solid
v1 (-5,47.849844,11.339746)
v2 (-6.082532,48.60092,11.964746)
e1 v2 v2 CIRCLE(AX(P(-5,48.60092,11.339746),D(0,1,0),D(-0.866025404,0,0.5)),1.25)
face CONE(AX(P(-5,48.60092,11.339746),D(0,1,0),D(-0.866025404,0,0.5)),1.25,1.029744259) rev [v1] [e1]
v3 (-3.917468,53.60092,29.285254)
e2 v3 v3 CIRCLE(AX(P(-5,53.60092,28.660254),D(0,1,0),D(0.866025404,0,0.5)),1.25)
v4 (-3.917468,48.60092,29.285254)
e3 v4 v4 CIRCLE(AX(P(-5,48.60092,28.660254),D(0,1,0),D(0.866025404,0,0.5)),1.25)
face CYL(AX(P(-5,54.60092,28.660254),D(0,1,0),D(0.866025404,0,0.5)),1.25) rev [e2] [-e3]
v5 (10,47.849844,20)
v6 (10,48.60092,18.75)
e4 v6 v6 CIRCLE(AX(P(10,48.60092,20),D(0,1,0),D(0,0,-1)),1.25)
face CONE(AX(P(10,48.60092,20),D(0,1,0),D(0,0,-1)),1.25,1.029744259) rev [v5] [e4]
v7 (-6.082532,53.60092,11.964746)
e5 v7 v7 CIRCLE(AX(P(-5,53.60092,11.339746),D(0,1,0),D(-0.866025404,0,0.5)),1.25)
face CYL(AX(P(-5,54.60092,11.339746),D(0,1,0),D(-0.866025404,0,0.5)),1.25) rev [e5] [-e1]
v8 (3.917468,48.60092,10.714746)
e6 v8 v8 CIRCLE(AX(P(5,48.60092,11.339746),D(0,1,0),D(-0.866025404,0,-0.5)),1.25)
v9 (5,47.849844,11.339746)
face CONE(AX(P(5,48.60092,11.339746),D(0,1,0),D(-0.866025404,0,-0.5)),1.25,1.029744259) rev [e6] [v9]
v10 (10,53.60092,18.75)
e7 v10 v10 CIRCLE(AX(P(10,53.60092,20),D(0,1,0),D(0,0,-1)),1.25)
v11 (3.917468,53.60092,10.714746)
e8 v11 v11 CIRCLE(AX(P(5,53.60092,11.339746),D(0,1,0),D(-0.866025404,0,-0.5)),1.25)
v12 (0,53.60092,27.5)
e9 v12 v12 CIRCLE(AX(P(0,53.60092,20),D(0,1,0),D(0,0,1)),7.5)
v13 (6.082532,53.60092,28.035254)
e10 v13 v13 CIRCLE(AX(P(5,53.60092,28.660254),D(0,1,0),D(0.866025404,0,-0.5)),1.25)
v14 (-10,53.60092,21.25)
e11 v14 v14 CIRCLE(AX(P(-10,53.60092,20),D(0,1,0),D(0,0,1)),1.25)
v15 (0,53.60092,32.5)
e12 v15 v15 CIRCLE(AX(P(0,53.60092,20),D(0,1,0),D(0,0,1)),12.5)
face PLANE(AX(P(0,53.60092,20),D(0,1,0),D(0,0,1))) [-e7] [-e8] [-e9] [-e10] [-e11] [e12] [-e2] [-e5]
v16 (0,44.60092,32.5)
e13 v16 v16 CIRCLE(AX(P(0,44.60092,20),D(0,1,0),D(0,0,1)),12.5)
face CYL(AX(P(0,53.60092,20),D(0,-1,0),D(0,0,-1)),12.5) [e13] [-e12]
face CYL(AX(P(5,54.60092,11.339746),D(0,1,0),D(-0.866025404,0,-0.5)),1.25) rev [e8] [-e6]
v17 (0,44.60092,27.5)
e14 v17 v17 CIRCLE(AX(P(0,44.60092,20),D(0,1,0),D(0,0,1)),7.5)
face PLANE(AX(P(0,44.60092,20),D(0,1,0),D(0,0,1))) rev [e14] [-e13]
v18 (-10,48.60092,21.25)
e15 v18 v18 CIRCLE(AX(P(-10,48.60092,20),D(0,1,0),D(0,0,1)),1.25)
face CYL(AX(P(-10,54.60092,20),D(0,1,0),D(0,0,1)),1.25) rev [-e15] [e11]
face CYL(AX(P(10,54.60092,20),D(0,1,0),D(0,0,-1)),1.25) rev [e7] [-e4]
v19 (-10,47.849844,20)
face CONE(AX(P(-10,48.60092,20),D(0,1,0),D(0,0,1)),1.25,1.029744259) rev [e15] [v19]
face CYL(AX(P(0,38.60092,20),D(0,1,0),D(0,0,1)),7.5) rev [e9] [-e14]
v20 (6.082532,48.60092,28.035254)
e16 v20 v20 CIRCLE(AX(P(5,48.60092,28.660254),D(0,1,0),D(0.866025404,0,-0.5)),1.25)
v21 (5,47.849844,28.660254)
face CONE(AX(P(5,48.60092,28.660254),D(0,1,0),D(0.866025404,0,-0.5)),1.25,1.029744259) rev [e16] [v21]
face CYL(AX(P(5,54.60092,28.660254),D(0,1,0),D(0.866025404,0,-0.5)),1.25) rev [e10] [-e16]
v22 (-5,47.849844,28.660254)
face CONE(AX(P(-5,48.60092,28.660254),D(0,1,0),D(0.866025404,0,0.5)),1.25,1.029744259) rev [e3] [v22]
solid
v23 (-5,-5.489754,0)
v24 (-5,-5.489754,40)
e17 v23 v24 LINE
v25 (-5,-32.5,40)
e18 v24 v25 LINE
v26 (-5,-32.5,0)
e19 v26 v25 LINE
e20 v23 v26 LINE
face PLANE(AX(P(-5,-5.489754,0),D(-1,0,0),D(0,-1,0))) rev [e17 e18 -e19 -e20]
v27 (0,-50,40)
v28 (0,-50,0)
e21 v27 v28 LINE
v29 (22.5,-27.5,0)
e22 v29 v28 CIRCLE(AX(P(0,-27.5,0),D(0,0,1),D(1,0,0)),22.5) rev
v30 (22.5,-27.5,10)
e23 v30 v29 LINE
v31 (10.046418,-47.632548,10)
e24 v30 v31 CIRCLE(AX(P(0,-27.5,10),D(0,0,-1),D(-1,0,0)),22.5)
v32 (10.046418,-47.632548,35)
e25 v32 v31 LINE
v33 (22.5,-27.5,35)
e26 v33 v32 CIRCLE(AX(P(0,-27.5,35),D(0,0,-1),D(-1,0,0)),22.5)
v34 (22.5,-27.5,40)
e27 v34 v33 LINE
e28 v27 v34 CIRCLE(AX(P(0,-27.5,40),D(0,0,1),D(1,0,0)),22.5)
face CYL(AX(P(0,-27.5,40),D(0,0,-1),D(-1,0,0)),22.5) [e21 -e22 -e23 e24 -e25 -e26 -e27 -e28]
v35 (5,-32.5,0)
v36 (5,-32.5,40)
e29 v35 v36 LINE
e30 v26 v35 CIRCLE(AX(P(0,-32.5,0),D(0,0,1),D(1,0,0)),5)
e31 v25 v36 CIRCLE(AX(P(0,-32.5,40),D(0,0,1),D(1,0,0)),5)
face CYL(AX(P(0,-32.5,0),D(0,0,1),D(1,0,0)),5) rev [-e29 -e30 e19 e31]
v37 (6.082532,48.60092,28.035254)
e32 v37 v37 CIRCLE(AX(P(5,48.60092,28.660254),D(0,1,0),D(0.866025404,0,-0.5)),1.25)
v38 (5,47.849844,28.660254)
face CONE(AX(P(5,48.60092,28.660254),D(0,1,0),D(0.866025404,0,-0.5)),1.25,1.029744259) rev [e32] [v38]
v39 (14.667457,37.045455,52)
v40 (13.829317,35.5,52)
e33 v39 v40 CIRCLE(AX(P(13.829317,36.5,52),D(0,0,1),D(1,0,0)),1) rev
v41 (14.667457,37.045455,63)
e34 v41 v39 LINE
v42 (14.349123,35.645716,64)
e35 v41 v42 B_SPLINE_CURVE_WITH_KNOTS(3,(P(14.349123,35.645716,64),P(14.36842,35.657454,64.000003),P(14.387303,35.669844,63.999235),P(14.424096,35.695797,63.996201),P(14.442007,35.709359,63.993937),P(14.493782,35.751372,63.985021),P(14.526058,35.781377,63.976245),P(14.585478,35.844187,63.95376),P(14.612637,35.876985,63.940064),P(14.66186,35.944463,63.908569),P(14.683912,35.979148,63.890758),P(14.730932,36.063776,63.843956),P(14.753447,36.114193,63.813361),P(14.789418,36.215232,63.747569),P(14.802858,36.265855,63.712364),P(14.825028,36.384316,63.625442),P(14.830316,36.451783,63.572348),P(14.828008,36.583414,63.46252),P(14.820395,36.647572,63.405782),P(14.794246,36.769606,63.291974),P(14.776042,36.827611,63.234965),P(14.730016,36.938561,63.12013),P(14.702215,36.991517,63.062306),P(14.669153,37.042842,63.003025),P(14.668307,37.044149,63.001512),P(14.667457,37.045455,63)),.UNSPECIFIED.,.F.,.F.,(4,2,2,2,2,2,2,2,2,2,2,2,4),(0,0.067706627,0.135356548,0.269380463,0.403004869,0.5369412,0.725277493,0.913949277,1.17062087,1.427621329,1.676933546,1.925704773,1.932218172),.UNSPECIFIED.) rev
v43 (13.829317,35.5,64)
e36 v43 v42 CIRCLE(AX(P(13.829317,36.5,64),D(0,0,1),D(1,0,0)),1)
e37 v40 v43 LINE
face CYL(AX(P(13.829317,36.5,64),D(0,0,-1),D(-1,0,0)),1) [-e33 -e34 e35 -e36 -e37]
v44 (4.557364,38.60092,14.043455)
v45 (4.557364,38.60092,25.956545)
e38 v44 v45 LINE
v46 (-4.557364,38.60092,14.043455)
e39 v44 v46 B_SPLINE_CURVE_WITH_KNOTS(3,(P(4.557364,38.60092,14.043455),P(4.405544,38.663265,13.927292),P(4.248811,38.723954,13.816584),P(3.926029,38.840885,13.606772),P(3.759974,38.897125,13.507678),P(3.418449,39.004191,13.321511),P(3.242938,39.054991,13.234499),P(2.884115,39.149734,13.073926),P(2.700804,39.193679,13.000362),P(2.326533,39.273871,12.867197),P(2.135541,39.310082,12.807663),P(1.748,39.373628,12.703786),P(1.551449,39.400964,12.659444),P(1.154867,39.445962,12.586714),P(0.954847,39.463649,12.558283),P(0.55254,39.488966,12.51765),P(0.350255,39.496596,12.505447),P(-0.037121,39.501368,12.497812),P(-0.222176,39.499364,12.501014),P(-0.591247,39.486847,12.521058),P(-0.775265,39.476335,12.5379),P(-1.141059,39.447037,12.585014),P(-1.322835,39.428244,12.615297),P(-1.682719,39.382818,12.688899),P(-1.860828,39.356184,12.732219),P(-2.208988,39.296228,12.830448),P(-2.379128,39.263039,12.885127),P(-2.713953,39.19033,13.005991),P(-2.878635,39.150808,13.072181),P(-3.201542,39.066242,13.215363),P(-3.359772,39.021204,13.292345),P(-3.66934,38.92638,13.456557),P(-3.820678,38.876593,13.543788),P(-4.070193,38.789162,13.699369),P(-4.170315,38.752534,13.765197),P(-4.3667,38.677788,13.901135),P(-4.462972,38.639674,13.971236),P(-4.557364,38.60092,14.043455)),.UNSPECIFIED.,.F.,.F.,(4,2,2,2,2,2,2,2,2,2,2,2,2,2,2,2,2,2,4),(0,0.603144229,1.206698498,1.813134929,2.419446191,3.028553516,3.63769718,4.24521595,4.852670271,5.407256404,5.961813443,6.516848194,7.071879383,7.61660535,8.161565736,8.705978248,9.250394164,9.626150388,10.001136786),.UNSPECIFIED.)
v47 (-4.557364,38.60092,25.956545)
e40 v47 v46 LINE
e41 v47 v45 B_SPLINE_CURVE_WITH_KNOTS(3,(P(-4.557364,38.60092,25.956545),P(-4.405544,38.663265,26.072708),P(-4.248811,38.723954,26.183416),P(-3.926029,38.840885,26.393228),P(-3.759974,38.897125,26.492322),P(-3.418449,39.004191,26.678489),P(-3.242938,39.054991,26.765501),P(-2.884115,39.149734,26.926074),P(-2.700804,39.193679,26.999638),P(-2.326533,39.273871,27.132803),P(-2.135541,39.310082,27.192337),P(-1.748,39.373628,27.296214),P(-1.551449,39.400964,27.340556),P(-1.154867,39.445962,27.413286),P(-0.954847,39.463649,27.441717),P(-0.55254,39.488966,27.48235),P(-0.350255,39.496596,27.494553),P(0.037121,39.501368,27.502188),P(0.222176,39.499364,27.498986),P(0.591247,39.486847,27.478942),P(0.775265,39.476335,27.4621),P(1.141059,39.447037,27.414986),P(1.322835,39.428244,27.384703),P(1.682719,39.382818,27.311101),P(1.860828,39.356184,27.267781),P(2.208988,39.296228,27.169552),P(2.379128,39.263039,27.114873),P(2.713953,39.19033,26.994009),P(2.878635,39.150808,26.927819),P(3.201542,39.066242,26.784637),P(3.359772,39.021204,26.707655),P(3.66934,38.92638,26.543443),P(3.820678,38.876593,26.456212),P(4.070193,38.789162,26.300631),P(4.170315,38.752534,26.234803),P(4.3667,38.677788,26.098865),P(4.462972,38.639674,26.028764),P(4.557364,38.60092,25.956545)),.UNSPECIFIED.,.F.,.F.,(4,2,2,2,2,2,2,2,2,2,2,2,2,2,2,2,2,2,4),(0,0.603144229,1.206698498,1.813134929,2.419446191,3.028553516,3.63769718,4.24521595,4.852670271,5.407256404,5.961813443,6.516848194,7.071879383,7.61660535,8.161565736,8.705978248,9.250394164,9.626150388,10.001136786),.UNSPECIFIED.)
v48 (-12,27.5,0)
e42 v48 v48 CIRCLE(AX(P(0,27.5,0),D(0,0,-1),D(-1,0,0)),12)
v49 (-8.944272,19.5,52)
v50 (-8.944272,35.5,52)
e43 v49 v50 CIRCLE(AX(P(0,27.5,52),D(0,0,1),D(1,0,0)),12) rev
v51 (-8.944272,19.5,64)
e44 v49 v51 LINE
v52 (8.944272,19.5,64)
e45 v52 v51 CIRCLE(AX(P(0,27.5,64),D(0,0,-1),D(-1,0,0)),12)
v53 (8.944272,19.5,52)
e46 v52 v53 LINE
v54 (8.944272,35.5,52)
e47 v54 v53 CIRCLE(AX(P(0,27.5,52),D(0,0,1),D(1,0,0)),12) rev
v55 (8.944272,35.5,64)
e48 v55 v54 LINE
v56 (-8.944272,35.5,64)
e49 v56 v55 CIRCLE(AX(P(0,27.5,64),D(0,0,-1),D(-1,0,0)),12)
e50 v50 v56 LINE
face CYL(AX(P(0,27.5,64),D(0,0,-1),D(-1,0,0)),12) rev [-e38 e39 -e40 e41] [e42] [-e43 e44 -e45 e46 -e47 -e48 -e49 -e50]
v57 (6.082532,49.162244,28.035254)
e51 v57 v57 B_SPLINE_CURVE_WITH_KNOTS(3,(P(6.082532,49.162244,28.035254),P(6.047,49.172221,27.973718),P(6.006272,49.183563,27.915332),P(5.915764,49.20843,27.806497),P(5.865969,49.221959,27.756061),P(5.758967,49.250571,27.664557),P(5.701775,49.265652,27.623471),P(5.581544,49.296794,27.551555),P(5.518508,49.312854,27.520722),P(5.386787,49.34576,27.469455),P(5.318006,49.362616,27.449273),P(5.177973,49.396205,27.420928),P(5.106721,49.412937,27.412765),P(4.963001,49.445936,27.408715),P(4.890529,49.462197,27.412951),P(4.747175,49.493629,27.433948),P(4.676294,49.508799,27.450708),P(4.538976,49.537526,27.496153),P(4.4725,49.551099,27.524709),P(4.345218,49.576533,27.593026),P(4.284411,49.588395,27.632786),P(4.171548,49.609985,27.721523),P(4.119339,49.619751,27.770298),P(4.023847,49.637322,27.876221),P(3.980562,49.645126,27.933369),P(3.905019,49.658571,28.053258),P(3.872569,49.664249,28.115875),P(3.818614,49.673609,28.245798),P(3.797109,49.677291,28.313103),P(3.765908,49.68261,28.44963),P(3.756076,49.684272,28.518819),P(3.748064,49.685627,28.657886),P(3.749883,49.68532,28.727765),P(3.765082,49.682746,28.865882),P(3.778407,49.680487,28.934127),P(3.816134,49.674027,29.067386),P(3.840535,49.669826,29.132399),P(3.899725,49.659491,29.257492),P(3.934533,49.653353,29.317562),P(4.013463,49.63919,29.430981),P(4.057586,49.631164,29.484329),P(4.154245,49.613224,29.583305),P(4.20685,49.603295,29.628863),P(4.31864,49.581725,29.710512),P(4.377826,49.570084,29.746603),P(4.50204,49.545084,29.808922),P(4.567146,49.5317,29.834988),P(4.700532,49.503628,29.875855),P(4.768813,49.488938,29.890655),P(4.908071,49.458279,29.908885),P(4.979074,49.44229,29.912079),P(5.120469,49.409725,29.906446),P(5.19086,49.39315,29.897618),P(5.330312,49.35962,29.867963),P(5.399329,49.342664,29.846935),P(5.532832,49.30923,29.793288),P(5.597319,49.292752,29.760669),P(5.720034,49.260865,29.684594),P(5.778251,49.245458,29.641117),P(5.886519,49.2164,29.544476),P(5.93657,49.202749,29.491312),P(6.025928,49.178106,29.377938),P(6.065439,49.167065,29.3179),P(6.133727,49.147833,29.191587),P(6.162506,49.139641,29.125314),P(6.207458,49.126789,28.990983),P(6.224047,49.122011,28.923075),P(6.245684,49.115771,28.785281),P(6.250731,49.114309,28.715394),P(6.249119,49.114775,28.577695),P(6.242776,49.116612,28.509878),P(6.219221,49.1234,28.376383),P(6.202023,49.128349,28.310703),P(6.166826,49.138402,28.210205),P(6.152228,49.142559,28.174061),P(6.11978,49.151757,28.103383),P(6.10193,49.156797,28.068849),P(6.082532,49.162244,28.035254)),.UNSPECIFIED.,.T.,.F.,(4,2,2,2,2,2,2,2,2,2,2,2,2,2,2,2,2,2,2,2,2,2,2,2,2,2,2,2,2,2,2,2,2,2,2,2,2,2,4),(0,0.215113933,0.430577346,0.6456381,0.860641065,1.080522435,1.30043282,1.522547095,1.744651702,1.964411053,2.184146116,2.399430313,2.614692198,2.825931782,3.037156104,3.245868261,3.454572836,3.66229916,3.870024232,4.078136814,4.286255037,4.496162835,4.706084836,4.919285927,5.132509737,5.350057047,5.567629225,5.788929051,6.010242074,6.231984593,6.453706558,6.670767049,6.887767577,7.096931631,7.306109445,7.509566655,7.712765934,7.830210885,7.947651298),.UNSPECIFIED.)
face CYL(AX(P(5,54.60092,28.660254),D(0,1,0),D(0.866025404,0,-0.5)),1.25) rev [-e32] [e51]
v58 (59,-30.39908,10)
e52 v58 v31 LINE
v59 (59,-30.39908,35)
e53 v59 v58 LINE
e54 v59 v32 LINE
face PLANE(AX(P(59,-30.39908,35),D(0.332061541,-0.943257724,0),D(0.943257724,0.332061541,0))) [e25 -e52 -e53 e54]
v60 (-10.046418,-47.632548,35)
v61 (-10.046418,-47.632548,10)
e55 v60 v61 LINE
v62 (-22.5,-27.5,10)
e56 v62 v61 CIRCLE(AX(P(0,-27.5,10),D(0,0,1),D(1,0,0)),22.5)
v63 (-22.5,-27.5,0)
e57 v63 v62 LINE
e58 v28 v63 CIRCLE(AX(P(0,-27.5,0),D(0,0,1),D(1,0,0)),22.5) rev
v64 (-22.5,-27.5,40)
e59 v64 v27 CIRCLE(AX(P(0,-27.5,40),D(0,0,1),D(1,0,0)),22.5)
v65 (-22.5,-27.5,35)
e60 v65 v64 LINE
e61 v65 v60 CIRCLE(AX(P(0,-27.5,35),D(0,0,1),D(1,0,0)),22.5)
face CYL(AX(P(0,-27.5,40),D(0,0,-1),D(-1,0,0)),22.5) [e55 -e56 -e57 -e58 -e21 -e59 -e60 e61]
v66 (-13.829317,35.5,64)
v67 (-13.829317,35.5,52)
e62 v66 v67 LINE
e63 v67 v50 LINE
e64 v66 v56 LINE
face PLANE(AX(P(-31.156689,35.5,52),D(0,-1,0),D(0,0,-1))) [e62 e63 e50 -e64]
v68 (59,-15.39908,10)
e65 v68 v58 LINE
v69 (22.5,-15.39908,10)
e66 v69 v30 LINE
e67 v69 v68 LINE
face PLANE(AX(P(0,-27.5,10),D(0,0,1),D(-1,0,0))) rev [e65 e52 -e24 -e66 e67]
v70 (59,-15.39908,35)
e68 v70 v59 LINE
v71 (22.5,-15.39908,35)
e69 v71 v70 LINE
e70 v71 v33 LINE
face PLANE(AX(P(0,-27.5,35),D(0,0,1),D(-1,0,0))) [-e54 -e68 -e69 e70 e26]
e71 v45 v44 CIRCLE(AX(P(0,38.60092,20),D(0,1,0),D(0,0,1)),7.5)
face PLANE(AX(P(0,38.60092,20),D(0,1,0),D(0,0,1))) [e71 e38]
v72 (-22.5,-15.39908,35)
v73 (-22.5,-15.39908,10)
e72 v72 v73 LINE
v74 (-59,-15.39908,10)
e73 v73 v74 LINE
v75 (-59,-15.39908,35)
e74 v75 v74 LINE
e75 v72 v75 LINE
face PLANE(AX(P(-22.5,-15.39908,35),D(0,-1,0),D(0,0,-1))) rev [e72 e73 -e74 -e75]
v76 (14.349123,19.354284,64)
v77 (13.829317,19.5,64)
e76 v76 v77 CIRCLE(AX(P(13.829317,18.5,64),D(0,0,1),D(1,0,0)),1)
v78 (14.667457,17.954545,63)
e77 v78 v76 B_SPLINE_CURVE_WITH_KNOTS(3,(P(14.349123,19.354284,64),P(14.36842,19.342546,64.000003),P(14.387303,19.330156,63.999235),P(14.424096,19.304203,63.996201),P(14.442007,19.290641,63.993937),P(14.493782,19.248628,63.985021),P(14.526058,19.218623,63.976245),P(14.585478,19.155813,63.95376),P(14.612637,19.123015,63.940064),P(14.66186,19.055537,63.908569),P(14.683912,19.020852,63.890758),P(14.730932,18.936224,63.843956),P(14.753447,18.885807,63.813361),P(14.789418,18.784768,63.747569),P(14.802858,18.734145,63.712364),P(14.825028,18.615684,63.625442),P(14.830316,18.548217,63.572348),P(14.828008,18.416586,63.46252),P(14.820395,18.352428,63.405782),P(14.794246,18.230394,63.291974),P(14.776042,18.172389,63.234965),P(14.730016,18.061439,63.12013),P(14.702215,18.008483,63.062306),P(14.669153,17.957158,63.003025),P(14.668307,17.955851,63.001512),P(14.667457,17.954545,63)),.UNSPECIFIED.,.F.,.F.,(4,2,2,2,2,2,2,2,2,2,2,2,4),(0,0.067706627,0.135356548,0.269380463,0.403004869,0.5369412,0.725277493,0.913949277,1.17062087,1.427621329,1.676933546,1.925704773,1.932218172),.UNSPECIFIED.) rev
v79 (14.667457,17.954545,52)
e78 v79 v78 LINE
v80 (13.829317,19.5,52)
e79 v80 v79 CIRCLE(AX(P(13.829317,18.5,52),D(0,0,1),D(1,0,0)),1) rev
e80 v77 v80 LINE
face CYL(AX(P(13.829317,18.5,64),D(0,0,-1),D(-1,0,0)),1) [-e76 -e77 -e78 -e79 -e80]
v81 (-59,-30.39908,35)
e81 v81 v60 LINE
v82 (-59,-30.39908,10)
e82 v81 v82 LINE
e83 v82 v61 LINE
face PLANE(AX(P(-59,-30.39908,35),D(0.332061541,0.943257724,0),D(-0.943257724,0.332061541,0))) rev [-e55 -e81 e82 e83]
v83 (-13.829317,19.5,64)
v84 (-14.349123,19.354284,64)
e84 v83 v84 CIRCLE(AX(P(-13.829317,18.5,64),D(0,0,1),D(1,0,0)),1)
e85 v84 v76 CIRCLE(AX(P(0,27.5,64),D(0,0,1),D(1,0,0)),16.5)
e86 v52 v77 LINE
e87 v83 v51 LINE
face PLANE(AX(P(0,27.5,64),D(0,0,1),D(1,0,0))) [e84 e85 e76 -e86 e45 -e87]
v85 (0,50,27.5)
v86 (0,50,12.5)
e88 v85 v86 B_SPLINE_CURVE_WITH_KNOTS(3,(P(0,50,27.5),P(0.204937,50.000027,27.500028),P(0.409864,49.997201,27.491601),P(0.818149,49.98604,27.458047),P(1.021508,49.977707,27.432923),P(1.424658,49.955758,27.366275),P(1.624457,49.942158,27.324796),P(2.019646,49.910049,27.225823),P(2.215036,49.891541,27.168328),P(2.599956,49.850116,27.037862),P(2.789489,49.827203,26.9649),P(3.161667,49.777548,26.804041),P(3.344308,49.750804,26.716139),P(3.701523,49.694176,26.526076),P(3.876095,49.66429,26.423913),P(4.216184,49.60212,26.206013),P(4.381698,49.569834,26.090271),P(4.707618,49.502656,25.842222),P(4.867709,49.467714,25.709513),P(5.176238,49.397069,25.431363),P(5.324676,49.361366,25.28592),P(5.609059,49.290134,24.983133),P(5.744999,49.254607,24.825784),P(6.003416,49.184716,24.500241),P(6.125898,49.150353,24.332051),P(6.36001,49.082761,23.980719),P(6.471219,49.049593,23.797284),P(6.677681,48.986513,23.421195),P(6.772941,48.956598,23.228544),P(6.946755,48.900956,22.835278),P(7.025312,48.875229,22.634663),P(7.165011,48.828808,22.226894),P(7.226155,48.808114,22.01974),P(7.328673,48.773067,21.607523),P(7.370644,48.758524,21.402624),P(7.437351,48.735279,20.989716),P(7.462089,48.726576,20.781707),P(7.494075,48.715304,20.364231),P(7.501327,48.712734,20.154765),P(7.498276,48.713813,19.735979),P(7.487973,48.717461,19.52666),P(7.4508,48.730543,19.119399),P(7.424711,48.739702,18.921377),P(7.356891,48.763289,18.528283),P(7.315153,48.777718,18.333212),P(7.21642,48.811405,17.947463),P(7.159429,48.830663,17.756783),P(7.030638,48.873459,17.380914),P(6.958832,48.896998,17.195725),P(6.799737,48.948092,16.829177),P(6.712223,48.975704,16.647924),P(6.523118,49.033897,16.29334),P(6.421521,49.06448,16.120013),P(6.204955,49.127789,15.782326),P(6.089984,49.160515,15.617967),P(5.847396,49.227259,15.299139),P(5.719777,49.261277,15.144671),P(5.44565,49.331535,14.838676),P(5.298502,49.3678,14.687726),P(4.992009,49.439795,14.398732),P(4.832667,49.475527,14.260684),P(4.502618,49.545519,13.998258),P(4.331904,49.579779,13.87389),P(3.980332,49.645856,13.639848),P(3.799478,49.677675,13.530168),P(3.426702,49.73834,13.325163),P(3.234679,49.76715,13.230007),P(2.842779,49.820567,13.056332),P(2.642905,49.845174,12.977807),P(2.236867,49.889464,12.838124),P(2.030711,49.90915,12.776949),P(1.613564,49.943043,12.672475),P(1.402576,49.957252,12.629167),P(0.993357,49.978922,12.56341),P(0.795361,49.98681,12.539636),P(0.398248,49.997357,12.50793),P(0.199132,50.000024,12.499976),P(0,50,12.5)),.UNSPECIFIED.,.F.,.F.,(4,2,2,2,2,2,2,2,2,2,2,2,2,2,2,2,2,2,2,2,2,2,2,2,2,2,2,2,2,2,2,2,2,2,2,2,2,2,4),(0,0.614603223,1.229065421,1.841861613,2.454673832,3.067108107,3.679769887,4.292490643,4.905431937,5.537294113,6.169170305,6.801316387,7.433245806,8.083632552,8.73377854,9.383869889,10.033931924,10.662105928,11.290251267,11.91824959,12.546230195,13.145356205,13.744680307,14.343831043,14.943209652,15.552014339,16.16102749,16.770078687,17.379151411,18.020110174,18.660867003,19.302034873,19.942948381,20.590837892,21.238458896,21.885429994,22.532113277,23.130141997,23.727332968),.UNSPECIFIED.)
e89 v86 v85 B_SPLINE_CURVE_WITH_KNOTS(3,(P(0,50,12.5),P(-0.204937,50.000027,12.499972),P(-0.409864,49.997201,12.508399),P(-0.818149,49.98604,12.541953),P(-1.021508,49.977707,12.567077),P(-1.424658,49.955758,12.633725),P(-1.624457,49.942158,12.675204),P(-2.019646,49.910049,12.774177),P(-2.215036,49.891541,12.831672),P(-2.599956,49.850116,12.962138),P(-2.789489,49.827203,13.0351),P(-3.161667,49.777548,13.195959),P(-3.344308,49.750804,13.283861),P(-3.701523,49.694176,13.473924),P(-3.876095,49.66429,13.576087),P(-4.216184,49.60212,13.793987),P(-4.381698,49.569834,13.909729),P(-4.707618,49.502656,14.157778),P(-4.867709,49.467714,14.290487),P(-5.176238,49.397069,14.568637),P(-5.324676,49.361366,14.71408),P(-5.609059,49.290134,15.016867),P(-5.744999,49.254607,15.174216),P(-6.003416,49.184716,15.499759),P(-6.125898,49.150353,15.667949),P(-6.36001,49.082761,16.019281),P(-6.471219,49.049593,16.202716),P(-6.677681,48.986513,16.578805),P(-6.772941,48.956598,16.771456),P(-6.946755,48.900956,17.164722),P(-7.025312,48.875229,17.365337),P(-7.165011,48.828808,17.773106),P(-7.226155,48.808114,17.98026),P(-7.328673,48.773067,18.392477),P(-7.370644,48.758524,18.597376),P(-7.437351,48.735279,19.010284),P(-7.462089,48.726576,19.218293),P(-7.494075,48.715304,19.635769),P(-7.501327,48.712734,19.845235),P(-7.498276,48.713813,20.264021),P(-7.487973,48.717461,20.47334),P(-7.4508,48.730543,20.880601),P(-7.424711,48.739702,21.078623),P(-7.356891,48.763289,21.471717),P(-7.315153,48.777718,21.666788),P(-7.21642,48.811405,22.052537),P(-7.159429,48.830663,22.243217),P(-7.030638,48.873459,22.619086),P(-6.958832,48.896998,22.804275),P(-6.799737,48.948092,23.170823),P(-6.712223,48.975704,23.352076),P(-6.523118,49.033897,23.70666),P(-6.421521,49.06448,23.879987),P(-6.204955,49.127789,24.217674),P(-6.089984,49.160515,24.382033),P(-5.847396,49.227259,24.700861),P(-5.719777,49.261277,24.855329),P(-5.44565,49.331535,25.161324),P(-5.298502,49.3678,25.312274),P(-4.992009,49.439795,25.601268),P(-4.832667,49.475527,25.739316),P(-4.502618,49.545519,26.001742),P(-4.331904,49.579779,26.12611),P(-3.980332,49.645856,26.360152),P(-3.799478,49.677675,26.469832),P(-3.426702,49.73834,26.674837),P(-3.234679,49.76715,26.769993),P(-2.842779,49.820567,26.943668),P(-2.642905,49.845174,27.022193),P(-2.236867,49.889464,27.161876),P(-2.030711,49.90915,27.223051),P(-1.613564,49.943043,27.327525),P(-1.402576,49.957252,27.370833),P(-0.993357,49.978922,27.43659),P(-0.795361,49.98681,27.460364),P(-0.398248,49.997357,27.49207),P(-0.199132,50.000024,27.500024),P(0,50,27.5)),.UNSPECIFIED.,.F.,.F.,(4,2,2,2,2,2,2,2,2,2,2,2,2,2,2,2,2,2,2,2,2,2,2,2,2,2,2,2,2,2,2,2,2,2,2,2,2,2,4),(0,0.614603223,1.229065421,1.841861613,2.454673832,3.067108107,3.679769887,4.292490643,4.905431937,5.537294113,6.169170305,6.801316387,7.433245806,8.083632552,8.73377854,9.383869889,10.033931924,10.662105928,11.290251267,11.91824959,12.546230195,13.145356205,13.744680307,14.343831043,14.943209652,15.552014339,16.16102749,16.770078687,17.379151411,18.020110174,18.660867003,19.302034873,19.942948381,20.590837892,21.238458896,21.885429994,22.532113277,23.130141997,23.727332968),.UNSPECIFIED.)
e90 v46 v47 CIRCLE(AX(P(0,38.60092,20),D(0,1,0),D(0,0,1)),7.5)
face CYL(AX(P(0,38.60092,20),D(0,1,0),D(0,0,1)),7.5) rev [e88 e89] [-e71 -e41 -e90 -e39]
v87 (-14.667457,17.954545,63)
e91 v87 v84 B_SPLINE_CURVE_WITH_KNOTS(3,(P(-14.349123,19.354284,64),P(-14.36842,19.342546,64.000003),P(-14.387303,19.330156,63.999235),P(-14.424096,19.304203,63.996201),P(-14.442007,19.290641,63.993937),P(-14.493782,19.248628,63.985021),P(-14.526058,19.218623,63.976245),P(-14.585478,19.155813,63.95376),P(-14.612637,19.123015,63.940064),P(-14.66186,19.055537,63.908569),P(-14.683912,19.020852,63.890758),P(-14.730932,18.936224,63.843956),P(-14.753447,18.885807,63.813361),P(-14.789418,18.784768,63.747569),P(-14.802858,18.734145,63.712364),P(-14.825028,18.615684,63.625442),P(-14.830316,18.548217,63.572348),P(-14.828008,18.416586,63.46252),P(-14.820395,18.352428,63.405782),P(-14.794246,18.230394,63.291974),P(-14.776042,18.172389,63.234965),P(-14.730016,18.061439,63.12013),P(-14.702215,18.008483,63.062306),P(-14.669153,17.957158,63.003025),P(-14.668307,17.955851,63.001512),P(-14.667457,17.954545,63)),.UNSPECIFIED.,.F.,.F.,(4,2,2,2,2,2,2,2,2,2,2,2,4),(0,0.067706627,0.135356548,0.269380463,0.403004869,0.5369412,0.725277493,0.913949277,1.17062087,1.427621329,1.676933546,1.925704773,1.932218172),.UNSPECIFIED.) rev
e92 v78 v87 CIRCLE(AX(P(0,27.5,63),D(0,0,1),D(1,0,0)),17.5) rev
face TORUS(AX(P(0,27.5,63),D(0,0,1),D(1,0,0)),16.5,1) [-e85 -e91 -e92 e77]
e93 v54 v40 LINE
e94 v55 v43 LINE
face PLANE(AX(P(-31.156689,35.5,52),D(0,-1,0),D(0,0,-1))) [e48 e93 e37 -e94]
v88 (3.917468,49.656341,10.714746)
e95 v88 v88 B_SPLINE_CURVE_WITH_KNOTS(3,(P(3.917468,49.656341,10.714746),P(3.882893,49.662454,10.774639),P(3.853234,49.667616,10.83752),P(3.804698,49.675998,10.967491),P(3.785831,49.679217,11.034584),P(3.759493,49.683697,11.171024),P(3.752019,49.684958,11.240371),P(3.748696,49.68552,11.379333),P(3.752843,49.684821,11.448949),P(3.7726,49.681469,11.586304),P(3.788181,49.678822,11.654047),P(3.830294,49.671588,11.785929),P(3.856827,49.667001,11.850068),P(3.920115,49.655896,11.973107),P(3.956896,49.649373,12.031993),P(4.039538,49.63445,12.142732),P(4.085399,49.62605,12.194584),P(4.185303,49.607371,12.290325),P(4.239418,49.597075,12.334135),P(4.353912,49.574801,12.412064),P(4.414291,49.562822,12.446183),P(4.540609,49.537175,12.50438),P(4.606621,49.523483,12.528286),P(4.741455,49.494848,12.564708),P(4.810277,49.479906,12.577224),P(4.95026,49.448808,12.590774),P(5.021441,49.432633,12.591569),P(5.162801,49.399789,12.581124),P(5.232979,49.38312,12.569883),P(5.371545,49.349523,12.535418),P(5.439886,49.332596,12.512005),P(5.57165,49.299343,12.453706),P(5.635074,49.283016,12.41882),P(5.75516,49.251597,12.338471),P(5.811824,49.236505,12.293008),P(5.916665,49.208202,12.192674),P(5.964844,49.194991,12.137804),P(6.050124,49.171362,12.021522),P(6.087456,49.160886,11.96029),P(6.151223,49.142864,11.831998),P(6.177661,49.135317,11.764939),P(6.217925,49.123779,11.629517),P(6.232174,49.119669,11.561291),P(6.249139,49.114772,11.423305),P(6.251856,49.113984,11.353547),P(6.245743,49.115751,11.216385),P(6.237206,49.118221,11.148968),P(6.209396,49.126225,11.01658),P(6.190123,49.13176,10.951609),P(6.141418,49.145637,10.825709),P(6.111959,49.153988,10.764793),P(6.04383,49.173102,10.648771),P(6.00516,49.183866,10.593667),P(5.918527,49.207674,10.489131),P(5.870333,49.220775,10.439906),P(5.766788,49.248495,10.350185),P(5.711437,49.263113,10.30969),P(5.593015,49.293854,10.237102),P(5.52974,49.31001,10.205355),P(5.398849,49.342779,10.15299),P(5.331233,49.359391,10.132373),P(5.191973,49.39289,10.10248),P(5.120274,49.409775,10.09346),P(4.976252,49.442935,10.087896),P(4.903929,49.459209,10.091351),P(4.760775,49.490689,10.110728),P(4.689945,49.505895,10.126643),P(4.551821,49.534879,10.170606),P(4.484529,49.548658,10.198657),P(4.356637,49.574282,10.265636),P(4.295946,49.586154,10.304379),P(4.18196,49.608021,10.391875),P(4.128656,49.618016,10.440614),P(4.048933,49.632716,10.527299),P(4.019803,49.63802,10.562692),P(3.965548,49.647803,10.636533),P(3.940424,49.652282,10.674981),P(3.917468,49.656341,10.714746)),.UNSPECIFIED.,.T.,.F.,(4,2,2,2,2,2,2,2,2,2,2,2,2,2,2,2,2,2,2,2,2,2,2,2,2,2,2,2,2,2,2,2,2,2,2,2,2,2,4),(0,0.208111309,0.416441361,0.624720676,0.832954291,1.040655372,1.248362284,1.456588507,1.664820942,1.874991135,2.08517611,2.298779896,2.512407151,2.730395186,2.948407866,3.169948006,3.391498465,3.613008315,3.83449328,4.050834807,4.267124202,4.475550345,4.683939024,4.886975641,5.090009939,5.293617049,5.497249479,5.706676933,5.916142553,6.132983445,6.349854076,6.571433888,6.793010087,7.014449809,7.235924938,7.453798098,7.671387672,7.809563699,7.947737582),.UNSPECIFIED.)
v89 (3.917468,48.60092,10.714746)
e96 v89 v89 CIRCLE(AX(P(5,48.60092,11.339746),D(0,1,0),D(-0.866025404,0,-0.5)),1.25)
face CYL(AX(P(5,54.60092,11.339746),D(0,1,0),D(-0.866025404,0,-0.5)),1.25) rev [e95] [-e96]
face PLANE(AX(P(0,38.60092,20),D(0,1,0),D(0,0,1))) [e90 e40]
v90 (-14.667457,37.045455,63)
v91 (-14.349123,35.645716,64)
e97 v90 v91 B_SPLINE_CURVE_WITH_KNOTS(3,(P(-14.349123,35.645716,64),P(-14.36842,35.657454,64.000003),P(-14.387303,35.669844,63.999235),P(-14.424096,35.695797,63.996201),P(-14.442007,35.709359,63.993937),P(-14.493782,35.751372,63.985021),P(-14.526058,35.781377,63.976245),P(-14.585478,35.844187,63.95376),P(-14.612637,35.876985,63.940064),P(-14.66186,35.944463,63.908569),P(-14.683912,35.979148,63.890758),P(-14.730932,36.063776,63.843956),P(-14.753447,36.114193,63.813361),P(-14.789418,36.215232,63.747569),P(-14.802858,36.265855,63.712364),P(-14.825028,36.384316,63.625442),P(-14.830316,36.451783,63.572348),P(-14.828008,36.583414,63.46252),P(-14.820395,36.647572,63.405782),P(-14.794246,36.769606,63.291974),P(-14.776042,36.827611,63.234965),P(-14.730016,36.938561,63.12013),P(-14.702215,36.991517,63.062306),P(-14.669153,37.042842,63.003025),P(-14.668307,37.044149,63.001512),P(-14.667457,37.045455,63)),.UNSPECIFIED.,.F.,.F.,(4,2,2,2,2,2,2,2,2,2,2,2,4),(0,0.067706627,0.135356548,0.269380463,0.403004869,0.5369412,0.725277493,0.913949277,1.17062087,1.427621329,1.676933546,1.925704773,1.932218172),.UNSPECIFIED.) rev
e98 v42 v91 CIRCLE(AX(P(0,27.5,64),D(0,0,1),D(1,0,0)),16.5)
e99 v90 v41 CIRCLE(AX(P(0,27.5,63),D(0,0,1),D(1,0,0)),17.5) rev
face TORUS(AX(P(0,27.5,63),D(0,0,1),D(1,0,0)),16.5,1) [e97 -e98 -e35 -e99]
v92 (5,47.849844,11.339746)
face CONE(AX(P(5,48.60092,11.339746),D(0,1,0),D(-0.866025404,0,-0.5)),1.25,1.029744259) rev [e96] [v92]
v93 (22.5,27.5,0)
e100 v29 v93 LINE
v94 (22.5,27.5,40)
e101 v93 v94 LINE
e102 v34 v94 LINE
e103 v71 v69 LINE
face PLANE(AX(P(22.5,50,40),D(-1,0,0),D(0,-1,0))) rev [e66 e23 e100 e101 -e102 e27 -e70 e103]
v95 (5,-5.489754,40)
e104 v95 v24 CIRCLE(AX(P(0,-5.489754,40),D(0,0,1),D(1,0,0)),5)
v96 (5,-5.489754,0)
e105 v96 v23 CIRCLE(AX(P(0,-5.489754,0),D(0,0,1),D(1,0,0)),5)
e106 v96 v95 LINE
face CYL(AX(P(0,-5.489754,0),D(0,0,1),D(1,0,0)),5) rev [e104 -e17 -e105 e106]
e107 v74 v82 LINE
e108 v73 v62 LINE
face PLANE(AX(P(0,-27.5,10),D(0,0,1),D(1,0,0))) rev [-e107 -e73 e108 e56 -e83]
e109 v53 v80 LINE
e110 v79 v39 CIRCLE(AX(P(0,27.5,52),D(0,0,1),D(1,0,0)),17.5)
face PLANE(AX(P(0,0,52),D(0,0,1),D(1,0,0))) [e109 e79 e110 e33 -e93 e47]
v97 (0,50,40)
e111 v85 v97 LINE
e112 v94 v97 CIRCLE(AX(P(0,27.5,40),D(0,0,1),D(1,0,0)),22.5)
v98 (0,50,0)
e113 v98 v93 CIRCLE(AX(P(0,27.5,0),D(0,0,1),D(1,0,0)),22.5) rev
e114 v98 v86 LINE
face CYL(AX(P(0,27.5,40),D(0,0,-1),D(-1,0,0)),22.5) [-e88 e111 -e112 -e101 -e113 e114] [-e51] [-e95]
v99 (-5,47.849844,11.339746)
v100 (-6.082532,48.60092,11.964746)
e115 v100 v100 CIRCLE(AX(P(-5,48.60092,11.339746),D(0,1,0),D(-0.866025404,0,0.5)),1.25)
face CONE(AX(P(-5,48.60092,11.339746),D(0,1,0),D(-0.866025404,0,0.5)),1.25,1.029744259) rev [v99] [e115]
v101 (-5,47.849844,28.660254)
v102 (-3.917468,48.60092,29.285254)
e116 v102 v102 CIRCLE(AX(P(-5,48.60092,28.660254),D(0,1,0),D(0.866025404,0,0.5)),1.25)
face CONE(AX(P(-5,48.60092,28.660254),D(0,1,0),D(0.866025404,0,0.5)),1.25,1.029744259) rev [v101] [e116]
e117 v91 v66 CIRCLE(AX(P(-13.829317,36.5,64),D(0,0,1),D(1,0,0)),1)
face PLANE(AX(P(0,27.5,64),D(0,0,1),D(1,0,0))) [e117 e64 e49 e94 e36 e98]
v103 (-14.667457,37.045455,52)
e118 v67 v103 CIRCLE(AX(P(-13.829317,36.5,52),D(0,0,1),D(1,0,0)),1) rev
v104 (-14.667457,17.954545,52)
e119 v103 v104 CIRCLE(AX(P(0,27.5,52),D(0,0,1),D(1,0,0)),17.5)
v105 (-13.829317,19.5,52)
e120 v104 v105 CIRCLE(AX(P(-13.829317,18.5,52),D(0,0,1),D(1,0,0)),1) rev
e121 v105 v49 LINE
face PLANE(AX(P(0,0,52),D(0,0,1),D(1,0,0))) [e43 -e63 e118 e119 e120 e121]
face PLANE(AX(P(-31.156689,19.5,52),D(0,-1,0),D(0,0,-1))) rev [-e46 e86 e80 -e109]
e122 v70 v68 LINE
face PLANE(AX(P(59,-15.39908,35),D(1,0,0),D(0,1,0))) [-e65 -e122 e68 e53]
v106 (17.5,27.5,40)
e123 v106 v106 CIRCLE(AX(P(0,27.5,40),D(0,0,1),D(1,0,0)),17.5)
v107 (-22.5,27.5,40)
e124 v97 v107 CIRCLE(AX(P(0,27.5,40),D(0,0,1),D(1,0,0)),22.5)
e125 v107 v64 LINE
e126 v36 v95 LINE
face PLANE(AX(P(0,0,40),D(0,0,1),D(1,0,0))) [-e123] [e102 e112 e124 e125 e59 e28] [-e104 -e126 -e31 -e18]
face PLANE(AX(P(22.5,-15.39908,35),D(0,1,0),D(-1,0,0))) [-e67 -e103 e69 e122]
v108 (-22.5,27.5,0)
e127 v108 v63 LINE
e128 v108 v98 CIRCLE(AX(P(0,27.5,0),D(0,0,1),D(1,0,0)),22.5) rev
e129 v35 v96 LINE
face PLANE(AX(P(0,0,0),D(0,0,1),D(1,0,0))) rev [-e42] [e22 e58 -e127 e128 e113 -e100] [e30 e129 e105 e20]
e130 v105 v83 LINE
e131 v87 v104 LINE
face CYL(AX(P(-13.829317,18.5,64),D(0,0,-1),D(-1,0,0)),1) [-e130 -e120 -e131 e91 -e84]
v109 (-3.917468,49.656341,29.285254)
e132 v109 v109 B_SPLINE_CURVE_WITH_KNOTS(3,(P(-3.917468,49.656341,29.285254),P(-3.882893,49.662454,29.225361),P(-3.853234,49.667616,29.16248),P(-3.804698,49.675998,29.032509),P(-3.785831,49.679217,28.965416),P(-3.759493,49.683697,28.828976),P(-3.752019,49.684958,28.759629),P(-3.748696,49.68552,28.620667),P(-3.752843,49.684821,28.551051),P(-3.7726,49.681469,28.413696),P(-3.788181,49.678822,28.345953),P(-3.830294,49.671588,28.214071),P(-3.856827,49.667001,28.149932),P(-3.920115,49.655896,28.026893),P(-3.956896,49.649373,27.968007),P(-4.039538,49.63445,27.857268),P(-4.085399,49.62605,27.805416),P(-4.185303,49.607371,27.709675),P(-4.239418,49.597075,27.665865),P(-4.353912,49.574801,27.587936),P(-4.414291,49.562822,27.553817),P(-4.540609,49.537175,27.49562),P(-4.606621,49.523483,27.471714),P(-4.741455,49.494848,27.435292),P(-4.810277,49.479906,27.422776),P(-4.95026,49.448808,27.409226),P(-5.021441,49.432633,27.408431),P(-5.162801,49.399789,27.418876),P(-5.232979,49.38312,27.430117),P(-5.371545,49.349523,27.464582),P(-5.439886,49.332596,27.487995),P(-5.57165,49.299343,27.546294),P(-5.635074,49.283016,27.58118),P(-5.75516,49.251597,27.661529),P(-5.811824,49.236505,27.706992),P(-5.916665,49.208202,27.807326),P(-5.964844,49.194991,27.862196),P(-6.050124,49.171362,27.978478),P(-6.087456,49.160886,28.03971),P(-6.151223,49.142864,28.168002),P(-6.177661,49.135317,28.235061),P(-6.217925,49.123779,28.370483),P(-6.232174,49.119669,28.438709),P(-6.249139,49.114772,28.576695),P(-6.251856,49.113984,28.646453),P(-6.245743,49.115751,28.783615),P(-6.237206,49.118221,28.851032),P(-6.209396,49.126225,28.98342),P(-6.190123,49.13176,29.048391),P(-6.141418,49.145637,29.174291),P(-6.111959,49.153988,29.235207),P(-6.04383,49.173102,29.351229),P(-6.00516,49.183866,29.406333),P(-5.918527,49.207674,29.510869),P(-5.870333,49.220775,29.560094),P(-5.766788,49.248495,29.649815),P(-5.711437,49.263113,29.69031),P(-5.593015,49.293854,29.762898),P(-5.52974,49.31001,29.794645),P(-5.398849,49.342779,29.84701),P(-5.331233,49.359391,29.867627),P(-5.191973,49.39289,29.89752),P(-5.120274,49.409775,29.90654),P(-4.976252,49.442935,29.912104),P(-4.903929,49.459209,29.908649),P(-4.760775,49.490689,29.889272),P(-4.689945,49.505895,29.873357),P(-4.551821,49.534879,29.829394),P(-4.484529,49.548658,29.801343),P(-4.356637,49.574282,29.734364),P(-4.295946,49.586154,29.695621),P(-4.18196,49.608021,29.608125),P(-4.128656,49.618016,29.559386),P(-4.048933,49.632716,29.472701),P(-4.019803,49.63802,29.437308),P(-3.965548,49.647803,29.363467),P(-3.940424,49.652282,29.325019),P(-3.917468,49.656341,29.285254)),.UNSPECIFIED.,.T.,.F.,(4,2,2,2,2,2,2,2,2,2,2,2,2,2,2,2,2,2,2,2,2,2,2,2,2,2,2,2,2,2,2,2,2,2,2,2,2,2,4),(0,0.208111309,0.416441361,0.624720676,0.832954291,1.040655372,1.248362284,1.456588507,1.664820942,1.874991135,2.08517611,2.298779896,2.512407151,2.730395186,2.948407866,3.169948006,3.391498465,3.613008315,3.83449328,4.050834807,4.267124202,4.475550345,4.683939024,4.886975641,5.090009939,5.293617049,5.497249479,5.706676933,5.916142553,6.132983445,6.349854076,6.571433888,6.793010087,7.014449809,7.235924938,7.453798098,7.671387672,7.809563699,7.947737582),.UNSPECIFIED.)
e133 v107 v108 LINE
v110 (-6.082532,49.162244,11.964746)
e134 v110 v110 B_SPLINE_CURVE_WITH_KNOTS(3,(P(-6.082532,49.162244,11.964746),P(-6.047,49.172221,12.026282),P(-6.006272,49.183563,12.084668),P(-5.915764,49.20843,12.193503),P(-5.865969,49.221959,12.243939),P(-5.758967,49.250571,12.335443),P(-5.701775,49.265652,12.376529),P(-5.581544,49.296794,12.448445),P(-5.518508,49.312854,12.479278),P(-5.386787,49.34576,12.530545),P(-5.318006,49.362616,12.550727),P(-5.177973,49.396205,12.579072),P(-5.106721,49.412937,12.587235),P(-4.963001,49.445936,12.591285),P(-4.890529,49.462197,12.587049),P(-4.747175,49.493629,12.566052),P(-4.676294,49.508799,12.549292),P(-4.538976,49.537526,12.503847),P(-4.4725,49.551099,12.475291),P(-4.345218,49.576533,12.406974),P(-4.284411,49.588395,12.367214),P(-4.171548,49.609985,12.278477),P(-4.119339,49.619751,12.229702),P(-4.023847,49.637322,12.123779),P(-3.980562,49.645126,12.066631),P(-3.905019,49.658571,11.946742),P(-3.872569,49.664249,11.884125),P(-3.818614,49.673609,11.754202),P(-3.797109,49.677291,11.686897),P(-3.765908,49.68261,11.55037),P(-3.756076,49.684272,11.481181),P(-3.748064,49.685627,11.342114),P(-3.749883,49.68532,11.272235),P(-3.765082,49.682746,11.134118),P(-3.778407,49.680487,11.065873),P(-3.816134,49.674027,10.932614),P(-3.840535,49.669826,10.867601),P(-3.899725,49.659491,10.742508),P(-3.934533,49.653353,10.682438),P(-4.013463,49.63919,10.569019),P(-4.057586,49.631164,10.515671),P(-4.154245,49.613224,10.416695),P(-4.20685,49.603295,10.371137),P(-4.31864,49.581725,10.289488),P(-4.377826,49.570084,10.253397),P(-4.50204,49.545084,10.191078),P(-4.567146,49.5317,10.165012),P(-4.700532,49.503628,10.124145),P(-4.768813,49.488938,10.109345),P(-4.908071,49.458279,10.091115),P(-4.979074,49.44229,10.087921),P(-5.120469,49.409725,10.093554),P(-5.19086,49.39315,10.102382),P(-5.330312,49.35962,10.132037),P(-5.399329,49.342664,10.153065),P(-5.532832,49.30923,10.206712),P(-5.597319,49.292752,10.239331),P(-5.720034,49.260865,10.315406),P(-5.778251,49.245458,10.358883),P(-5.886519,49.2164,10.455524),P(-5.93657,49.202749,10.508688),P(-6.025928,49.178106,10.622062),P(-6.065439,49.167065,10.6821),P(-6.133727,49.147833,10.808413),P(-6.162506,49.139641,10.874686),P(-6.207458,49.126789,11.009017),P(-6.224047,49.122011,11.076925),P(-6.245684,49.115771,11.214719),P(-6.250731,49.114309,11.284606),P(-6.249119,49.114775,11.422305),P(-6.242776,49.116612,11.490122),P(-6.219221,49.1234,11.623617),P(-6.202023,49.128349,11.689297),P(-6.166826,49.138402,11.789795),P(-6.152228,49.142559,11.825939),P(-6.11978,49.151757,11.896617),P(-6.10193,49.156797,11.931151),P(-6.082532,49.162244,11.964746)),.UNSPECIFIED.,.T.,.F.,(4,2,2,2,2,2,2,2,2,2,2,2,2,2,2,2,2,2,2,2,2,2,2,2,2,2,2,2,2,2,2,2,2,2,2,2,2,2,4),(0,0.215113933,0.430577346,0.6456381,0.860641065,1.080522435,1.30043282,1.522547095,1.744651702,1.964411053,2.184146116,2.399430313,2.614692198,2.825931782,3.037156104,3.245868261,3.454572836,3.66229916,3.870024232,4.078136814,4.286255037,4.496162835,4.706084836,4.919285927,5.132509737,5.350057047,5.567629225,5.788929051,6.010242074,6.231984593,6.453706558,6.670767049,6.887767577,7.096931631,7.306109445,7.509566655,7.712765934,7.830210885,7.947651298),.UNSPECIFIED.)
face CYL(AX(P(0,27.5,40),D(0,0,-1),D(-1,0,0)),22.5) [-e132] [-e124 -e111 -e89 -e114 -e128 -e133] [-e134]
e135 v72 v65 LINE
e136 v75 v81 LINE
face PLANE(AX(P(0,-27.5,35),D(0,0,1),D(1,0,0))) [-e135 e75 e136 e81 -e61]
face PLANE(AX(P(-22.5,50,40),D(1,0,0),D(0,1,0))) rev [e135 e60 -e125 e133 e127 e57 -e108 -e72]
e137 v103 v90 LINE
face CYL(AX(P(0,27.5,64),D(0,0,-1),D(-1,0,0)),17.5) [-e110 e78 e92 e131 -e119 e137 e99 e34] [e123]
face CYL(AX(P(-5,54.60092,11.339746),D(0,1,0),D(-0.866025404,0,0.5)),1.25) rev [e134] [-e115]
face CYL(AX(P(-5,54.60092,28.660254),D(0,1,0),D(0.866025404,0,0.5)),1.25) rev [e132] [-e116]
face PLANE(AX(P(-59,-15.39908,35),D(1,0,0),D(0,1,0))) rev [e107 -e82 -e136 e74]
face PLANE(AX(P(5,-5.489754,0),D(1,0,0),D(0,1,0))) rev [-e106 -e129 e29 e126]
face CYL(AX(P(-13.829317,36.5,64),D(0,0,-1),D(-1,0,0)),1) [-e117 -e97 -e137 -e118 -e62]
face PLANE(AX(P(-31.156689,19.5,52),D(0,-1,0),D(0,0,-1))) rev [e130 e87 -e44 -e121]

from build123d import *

# Parameters (mm, degrees)
SKETCH_1_W               = 45
SKETCH_1_H               = 100
EXTRUDE_1_DEPTH          = 40
FILLET_1_R               = 22.5
SKETCH_2_R               = 17.5
EXTRUDE_2_DEPTH          = 24
SKETCH_4_R               = 12
CUT_EXTRUDE_2_DEPTH      = 85.274847968
EXTRUDE_START            = 10
EXTRUDE_4_DEPTH          = 25
SKETCH_5_W               = 62.313378502
SKETCH_5_H               = 16
CUT_EXTRUDE_5_DEPTH      = 12
SKETCH_12_R              = 12.5
EXTRUDE_9_DEPTH          = 9
SKETCH_13_R              = 7.5
CUT_EXTRUDE_6_DEPTH      = 15
CUT_EXTRUDE_7_DEPTH      = 90.185529408
PATTERN_CIRCULAR_2_COUNT = 6
FILLET_2_R               = 1


with BuildPart() as part:
    # 스케치1 → 보스-돌출1 (new body)
    with BuildSketch(Plane.XY):
        Rectangle(SKETCH_1_W, SKETCH_1_H)
    extrude(amount=EXTRUDE_1_DEPTH)

    # 필렛1
    fillet_1_edges = [part.edges().sort_by_distance(p)[0] for p in [
        (22.5, -50, 20),
        (-22.5, -50, 20),
        (22.5, 50, 20),
        (-22.5, 50, 20),
    ]]
    fillet(fillet_1_edges, radius=FILLET_1_R - 0.0001)  # a hair under: the kernel refuses the full size

    # 스케치2 → 보스-돌출2 (add)
    with BuildSketch(Plane.XY.offset(40)):
        with Locations((0, 27.5)):
            Circle(SKETCH_2_R)
    extrude(amount=EXTRUDE_2_DEPTH)

    # 스케치4 → 컷-돌출2 (cut, through all)
    with BuildSketch(Plane(origin=(0, 0, 0), x_dir=(-1, 0, 0), z_dir=(0, 0, -1))):
        with Locations((0, 27.5)):
            Circle(SKETCH_4_R)
    extrude(amount=-CUT_EXTRUDE_2_DEPTH, mode=Mode.SUBTRACT)

    # 스케치7 → 보스-돌출4 (add)
    with BuildSketch(Plane.XY.offset(EXTRUDE_START)):
        with BuildLine():
            Line((-22.5, -15.399079786), (-59, -15.399079786))
            Line((-59, -15.399079786), (-59, -30.399079786))
            Line((-59, -30.399079786), (-10.046418281, -47.63254777))
            ThreePointArc((-10.046418281, -47.63254777), (-19.134973365, -39.336502623), (-22.5, -27.5))
            Line((-22.5, -27.5), (-22.5, -15.399079786))
        make_face()
    extrude_4 = extrude(amount=EXTRUDE_4_DEPTH)

    # 대칭 복사1: 보스-돌출4 across plane
    add(extrude_4.mirror(Plane.ZY))

    # 스케치5 → 컷-돌출5 (cut)
    with BuildSketch(Plane.XY.offset(64)):
        with Locations((0, 27.5)):
            Rectangle(SKETCH_5_W, SKETCH_5_H)
    extrude(amount=-CUT_EXTRUDE_5_DEPTH, mode=Mode.SUBTRACT)


with BuildPart() as body_2:
    # 스케치12 → 보스-돌출9 (new body)
    with BuildSketch(Plane(origin=(0, 44.600920214, 0), x_dir=(1, 0, 0), z_dir=(0, 1, 0))):
        with Locations(Location((0, -20, 0), (0, 0, 270))):
            Circle(SKETCH_12_R)
    extrude(amount=EXTRUDE_9_DEPTH)


with BuildPart() as cut_extrude_6_tool:
    # 스케치13 → 컷-돌출6 (new body)
    with BuildSketch(Plane(origin=(0, 53.600920214, 0), x_dir=(1, 0, 0), z_dir=(0, 1, 0))):
        with Locations(Location((0, -20, 0), (0, 0, 270))):
            Circle(SKETCH_13_R)
    extrude(amount=-CUT_EXTRUDE_6_DEPTH)


with BuildPart() as part_1:
    add(part.part)

    # 컷-돌출6: cut by cut_extrude_6_tool
    add(cut_extrude_6_tool.part, mode=Mode.SUBTRACT)

    # 스케치18 → 컷-돌출7 (cut, through all)
    with BuildSketch(Plane.XY.offset(40)):
        with BuildLine():
            Line((5, -5.489754336), (5, -32.5))
            ThreePointArc((5, -32.5), (0, -37.5), (-5, -32.5))
            Line((-5, -32.5), (-5, -5.489754336))
            ThreePointArc((-5, -5.489754336), (0, -0.489754336), (5, -5.489754336))
        make_face()
    extrude(amount=-CUT_EXTRUDE_7_DEPTH, mode=Mode.SUBTRACT)


with BuildPart() as body_2_1:
    add(body_2.part)

    # 컷-돌출6: cut by cut_extrude_6_tool
    add(cut_extrude_6_tool.part, mode=Mode.SUBTRACT)

    # 스케치21 → M3 나사 구멍2 (revolve, cut)
    with BuildSketch(Plane(origin=(-10, 54.600920214, 20), x_dir=(0, 0, 1), z_dir=(1, 0, 0))):
        Polygon((0, 0), (0, 6.751075774), (1.25, 6), (1.25, 0.265564413), (1.525, 0), align=None)
    hole_wizard_m3_2 = revolve(axis=Axis((-10, 60.950920214, 20), (0, -1, 0)), mode=Mode.SUBTRACT)


with BuildPart() as pattern_circular_2_tool:
    # 원형 패턴2: M3 나사 구멍2 ×6 about axis
    pattern_circular_2_axis = Axis((0, 0, 20), (0, 1, 0))
    for i in range(1, PATTERN_CIRCULAR_2_COUNT):
        add(hole_wizard_m3_2.rotate(pattern_circular_2_axis, i * 360 / PATTERN_CIRCULAR_2_COUNT))


with BuildPart() as part_2:
    add(part_1.part)

    # 원형 패턴2: cut by pattern_circular_2_tool
    add(pattern_circular_2_tool.part, mode=Mode.SUBTRACT)

    # 필렛2
    fillet_2_edges = [part_2.edges().sort_by_distance(p)[0] for p in [
        (0, 45, 64),
        (0, 10, 64),
        (-15.564382416, 35.5, 58),
        (15.564382416, 35.5, 58),
        (-15.564382416, 19.5, 58),
        (15.564382416, 19.5, 58),
    ]]
    fillet(fillet_2_edges, radius=FILLET_2_R)


with BuildPart() as body_2_2:
    add(body_2_1.part)

    # 원형 패턴2: cut by pattern_circular_2_tool
    add(pattern_circular_2_tool.part, mode=Mode.SUBTRACT)


solid = Compound([part_2.part, body_2_2.part])
